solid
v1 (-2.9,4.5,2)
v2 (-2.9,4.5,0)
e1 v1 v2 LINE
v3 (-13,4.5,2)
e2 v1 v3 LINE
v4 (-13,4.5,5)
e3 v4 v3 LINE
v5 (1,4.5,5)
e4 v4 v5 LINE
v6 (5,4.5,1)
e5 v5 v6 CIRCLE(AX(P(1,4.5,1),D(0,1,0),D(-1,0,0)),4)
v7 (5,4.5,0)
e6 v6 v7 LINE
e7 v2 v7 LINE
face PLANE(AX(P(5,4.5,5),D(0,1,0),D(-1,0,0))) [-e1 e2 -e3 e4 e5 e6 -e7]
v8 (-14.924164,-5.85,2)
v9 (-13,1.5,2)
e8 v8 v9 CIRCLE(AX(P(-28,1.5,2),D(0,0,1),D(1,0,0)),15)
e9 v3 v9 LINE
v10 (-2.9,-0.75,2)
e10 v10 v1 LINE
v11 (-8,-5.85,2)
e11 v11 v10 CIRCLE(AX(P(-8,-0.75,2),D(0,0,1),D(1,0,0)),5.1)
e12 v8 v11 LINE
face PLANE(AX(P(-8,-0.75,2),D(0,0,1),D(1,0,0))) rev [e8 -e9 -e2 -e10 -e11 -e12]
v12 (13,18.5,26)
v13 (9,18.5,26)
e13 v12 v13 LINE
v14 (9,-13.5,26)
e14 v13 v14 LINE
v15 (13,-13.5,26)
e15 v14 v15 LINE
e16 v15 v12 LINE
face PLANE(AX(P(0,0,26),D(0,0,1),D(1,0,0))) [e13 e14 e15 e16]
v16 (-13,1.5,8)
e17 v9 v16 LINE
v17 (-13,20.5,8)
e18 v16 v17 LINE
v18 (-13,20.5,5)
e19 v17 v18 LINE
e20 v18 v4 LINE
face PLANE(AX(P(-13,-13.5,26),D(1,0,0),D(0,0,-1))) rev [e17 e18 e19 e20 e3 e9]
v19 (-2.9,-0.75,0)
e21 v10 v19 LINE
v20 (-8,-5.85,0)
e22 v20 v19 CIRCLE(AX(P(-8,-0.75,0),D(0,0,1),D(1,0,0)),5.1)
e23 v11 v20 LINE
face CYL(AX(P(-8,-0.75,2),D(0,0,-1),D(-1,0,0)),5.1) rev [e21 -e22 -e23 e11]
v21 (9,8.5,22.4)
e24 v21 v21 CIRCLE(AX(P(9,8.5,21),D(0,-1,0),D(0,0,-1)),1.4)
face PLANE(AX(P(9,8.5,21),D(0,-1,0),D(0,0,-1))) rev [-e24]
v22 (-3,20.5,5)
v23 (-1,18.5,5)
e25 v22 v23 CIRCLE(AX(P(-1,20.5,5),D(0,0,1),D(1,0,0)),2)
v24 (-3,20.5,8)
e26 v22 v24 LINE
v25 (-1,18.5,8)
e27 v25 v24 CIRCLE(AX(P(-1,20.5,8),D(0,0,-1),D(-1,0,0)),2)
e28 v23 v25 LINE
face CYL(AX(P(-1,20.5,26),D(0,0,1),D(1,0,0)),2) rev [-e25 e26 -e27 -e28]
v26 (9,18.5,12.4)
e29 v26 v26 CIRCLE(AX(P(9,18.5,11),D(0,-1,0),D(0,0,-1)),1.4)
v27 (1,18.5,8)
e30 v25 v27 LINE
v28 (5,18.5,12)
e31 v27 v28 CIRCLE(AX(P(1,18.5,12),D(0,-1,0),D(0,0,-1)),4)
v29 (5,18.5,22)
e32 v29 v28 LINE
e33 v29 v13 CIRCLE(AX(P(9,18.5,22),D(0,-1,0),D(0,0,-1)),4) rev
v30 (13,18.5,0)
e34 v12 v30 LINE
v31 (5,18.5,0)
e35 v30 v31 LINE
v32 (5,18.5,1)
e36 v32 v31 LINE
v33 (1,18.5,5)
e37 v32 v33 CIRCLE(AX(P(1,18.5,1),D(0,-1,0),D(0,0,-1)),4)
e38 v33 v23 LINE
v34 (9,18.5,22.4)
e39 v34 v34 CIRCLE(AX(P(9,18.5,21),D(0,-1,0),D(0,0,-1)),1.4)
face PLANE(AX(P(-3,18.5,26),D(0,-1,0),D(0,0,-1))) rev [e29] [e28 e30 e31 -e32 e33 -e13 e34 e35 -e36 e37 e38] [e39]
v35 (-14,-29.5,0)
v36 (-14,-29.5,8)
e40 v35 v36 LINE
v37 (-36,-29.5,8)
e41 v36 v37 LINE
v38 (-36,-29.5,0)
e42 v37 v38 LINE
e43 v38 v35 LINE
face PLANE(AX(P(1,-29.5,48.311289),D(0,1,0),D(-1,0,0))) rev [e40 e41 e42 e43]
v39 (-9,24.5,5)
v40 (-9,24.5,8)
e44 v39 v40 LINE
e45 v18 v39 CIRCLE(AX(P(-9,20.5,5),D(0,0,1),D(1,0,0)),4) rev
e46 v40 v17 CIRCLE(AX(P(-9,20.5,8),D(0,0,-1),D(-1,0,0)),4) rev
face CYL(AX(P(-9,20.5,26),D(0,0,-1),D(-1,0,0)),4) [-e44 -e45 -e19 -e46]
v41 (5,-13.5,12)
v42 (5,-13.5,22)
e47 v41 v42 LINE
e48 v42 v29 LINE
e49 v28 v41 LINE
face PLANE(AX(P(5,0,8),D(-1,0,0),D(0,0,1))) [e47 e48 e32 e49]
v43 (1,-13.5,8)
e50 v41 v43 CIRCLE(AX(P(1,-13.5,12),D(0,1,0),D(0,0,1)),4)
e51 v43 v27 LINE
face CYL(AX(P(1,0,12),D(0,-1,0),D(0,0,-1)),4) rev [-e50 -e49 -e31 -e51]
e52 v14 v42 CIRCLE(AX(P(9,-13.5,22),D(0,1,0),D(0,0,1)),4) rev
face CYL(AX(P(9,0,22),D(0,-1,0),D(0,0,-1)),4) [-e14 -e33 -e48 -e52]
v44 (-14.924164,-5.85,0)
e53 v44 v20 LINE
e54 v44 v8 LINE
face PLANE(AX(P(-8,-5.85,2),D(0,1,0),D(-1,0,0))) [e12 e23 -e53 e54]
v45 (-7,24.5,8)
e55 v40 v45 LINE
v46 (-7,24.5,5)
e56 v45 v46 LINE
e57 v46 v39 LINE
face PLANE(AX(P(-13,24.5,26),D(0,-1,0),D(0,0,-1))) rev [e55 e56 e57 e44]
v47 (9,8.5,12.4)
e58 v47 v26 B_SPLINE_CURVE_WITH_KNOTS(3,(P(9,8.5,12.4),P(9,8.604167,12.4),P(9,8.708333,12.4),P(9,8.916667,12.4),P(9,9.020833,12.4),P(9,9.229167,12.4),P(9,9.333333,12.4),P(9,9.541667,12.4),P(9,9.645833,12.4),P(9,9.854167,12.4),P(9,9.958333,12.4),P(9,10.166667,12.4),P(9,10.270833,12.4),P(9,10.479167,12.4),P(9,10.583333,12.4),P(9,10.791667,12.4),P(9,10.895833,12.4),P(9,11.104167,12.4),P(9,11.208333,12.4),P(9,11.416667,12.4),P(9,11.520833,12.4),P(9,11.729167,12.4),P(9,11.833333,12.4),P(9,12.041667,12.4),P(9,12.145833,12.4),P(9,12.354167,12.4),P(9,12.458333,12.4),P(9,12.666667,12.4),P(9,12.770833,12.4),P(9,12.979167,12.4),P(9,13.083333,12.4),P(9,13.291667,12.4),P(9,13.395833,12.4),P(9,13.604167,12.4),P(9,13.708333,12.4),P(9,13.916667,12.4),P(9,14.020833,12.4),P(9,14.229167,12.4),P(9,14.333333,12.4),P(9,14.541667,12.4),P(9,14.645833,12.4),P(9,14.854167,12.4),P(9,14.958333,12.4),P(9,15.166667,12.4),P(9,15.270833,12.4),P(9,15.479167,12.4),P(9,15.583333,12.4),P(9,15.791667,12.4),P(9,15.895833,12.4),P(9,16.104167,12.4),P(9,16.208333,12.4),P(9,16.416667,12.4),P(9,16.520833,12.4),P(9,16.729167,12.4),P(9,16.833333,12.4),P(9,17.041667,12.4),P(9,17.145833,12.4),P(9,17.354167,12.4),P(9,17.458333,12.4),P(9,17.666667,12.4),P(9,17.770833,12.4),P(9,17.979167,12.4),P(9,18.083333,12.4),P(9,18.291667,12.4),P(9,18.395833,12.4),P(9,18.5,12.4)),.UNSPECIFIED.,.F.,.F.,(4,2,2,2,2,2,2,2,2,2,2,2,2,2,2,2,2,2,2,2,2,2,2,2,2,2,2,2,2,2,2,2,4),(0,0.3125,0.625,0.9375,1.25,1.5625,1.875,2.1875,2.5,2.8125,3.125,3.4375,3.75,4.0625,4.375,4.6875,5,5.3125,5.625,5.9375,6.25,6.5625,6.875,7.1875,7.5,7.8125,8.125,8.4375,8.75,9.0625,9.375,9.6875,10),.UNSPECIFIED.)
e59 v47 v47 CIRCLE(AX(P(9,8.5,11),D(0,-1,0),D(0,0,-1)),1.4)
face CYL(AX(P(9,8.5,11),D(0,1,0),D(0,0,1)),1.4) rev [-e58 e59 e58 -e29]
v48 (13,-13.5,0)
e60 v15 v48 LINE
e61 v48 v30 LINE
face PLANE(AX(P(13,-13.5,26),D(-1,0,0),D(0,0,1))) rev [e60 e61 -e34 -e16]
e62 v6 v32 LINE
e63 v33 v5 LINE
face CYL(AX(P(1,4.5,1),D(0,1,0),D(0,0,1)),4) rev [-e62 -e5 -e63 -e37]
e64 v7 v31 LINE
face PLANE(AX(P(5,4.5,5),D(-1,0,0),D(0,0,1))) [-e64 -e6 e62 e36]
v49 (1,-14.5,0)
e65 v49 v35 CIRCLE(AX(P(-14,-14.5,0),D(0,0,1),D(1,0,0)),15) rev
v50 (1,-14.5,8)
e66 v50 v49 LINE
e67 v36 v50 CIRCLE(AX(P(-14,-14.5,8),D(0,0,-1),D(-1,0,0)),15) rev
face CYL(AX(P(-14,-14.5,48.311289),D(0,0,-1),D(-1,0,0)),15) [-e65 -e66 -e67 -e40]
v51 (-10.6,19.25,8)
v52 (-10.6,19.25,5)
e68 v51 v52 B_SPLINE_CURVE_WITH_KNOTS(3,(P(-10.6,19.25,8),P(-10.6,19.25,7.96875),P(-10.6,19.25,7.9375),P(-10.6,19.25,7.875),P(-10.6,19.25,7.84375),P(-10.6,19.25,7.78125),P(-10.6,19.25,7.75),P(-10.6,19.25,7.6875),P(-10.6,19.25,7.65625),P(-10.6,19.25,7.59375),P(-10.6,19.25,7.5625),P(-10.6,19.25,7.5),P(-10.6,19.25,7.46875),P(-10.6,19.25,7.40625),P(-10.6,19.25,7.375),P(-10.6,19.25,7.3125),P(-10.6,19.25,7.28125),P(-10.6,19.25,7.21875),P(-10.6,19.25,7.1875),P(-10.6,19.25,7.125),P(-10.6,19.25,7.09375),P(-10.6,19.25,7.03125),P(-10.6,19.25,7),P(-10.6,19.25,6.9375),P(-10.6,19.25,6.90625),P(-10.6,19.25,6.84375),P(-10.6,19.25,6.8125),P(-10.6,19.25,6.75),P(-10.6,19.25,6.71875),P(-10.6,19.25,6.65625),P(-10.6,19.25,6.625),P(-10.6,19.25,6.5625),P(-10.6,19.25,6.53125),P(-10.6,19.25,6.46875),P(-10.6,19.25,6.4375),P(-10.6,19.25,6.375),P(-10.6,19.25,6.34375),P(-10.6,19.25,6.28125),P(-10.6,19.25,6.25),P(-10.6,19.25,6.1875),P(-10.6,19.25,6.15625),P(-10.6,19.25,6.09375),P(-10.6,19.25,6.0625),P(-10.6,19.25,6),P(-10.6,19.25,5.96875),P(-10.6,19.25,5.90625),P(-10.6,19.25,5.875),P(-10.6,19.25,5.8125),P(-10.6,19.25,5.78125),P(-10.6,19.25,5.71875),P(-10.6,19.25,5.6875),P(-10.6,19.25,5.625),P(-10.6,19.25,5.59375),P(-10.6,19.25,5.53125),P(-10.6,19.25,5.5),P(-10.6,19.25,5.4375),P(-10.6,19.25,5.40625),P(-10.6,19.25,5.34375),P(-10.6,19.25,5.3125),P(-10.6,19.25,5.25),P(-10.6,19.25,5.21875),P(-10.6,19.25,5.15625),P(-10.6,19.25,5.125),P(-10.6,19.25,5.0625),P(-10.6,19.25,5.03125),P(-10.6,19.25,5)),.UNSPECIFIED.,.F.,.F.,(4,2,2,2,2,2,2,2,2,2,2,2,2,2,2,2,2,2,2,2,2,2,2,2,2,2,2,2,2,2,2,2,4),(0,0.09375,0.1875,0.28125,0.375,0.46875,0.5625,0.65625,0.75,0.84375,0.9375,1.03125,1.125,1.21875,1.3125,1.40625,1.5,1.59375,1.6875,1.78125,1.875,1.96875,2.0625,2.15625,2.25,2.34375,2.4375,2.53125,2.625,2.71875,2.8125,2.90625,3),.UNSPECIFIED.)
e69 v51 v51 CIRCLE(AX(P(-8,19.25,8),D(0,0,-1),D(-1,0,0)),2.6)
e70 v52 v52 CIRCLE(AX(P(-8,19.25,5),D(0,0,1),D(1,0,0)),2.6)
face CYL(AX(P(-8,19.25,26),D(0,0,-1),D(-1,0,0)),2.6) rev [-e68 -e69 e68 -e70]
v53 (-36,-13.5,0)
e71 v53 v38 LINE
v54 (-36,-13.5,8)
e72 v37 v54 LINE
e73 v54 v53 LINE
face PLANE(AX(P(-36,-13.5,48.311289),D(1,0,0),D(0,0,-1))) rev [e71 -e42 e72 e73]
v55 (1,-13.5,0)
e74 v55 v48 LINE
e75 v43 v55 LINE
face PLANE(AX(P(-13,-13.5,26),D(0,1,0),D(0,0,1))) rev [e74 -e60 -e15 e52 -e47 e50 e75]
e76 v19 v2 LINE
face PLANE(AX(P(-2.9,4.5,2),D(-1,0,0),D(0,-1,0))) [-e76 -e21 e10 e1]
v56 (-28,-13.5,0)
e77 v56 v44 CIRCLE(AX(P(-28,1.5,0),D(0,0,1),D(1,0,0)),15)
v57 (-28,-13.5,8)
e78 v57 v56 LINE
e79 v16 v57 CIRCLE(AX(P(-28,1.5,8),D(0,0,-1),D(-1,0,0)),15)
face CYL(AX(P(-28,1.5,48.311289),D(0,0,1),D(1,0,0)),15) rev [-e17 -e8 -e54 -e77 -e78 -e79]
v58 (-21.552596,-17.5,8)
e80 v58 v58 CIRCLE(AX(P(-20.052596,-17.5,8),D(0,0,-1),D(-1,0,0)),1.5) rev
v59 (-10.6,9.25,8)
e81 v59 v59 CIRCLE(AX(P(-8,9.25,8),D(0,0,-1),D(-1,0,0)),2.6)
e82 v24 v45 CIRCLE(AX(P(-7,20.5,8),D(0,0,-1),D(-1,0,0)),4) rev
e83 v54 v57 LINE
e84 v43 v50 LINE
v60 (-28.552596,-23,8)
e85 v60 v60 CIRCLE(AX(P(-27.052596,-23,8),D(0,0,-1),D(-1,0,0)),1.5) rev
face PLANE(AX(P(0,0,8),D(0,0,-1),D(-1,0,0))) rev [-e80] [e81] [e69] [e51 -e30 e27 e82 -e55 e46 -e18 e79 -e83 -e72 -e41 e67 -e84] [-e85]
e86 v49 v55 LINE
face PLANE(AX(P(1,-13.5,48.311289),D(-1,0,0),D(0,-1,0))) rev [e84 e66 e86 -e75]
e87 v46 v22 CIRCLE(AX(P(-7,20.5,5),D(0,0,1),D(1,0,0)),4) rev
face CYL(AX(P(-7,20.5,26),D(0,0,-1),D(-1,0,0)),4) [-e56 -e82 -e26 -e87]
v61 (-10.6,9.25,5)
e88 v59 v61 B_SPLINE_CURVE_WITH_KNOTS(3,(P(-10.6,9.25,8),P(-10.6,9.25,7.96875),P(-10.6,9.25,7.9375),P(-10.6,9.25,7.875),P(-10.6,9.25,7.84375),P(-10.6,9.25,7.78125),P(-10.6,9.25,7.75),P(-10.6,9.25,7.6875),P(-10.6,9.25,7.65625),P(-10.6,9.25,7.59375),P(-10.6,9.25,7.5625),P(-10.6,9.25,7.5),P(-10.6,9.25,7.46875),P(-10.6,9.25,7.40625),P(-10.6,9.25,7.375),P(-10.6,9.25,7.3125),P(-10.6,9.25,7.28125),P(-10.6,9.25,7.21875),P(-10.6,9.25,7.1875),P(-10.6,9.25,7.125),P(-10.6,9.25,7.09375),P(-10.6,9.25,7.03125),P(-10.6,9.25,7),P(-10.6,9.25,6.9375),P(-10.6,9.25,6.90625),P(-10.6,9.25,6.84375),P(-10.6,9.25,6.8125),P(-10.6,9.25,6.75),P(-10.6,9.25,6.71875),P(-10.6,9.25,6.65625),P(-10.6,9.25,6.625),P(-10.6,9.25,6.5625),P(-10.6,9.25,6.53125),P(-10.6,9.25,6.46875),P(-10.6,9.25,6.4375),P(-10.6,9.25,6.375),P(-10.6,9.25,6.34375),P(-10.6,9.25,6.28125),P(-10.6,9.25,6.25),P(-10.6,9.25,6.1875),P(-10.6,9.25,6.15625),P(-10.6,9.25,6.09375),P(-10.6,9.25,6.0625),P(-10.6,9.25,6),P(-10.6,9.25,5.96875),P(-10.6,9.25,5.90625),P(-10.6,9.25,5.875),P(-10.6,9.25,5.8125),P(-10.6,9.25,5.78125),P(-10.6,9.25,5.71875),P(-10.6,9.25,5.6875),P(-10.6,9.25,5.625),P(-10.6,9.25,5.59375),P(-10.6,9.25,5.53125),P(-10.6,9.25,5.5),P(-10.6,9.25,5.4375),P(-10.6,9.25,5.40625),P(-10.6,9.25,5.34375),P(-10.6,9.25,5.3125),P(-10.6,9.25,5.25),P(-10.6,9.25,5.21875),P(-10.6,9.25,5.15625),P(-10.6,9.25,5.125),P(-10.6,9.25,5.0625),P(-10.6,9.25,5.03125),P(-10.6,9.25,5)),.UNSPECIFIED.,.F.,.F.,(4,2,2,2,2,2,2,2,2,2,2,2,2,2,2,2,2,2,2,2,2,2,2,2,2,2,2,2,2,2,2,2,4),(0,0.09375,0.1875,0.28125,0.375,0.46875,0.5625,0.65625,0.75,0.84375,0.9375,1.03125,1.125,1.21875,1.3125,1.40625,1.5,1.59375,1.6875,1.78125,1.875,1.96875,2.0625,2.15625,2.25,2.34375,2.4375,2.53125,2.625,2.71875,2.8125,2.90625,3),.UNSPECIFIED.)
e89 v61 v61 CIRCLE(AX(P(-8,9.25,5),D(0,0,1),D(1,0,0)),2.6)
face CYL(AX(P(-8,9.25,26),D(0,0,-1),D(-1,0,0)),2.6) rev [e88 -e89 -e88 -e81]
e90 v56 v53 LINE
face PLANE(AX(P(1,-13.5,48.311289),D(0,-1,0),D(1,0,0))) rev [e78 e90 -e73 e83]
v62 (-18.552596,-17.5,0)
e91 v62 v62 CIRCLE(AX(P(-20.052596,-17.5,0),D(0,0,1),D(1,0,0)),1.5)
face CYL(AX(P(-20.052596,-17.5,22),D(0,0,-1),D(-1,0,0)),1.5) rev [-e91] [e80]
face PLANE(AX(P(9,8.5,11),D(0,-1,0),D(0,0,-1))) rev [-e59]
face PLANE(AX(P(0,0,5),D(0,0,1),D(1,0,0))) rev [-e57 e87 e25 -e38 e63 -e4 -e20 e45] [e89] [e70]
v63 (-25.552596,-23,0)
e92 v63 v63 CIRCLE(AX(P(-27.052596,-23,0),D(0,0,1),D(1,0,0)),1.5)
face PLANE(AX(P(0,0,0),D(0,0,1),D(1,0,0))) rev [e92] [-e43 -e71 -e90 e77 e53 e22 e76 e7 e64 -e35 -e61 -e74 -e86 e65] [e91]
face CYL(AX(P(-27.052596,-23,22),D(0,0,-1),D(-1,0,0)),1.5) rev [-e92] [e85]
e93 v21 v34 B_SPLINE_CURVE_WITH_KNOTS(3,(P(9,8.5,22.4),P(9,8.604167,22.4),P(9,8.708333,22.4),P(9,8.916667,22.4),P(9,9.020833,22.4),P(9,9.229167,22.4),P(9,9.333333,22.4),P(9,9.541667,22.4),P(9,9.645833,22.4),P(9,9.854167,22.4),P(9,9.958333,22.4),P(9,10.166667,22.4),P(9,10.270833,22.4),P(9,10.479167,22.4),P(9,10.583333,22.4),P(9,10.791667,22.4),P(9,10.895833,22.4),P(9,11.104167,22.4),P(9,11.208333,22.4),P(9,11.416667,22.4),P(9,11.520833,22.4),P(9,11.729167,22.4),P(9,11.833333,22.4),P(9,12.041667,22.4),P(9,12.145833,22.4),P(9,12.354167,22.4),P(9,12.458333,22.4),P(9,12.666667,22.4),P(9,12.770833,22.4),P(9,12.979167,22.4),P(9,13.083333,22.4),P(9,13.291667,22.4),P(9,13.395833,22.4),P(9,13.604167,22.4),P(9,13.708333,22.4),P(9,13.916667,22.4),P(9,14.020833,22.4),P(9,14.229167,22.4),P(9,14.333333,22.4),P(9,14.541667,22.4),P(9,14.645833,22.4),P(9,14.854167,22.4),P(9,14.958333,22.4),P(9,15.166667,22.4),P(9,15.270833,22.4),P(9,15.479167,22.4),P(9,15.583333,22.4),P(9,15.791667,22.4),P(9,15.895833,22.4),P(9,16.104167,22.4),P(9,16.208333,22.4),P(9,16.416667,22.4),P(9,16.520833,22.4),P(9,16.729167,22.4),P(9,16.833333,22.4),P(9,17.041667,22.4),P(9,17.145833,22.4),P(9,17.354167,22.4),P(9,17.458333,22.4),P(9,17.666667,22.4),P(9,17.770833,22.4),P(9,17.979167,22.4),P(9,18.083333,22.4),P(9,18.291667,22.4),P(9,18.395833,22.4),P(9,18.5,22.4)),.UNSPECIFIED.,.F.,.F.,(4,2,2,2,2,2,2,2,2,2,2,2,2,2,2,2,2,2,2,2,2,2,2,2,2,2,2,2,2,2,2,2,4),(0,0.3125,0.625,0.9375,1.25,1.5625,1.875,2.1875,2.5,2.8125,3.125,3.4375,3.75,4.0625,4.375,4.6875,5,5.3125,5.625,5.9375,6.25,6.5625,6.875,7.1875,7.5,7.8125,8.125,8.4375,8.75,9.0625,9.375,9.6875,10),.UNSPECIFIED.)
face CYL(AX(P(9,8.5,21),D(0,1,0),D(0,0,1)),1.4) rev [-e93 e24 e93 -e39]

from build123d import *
from OCP.BRepFilletAPI import BRepFilletAPI_MakeFillet

# Parameters (mm, degrees)
SKETCH1_R           = 2.6
BOSS_EXTRUDE1_DEPTH = 26
SKETCH2_W           = 18
SKETCH2_H           = 20
CUT_EXTRUDE1_DEPTH  = 5
CUT_EXTRUDE2_START  = 26
SKETCH3_W           = 18
SKETCH3_H           = 38
CUT_EXTRUDE2_DEPTH  = 18
CUT_EXTRUDE3_START  = 18.5
SKETCH4_R           = 1.4
CUT_EXTRUDE3_DEPTH  = 10
FILLET1_R           = 4
FILLET1_R_2         = 2
CUT_EXTRUDE4_DEPTH  = 2
SKETCH6_W           = 37
SKETCH6_H           = 16
BOSS_EXTRUDE2_DEPTH = 8
FILLET2_R           = 15
SKETCH7_R           = 1.5
CUT_EXTRUDE5_DEPTH  = 22


with BuildPart() as part:
    # Sketch1 → Boss-Extrude1 (new body)
    with BuildSketch(Plane.XY):
        Polygon((-13, -13.5), (13, -13.5), (13, 18.5), (-3, 18.5), (-3, 24.5), (-13, 24.5), (-13, 13.5), align=None)
        with Locations(Location((-8, 19.25, 0), (0, 0, 180))):
            Circle(SKETCH1_R, mode=Mode.SUBTRACT)
        with Locations(Location((-8, 9.25, 0), (0, 0, 180))):
            Circle(SKETCH1_R, mode=Mode.SUBTRACT)
    extrude(amount=BOSS_EXTRUDE1_DEPTH)

    # Sketch2 → Cut-Extrude1 (cut)
    with BuildSketch(Plane.XY):
        with Locations((-4, 14.5)):
            Rectangle(SKETCH2_W, SKETCH2_H)
    extrude(amount=CUT_EXTRUDE1_DEPTH, mode=Mode.SUBTRACT)

    # Sketch3 → Cut-Extrude2 (cut)
    with BuildSketch(Plane.XY.offset(CUT_EXTRUDE2_START)):
        with Locations((-4, 5.5)):
            Rectangle(SKETCH3_W, SKETCH3_H)
    extrude(amount=-CUT_EXTRUDE2_DEPTH, mode=Mode.SUBTRACT)

    # Sketch4 → Cut-Extrude3 (cut)
    with BuildSketch(Plane(origin=(0, 0, 0), x_dir=(1, 0, 0), z_dir=(0, 1, 0)).offset(CUT_EXTRUDE3_START)):
        with Locations(Location((9, -11, 0), (0, 0, 270))):
            Circle(SKETCH4_R)
        with Locations(Location((9, -21, 0), (0, 0, 270))):
            Circle(SKETCH4_R)
    extrude(amount=-CUT_EXTRUDE3_DEPTH, mode=Mode.SUBTRACT)

    # Fillet1
    fillet1_edges_1 = [part.edges().sort_by_distance(p)[0] for p in [
        (-3, 24.5, 6.5),
        (-13, 24.5, 6.5),
        (5, 11.5, 5),
        (5, 2.5, 8),
        (5, 2.5, 26),
    ]]
    fillet1_edges_2 = [part.edges().sort_by_distance(p)[0] for p in [
        (-3, 18.5, 6.5),
    ]]
    fillet1 = BRepFilletAPI_MakeFillet(part.part.solid().wrapped)
    for e in fillet1_edges_1:
        fillet1.Add(FILLET1_R - 0.0001, e.wrapped)
    for e in fillet1_edges_2:
        fillet1.Add(FILLET1_R_2 - 0.0001, e.wrapped)
    add(Compound.cast(fillet1.Shape()), mode=Mode.REPLACE)  # a hair under: the kernel refuses the full size

    # Sketch5 → Cut-Extrude4 (cut)
    with BuildSketch(Plane.XY):
        with BuildLine():
            Line((-8, -5.85), (-13, -5.85))
            Line((-13, -5.85), (-13, 4.5))
            Line((-13, 4.5), (-8, 4.5))
            Line((-8, 4.5), (-2.9, 4.5))
            Line((-2.9, 4.5), (-2.9, -0.75))
            ThreePointArc((-2.9, -0.75), (-4.393755416, -4.356244584), (-8, -5.85))
        make_face()
    extrude(amount=CUT_EXTRUDE4_DEPTH, mode=Mode.SUBTRACT)

    # Sketch6 → Boss-Extrude2 (add)
    with BuildSketch(Plane.XY):
        with Locations((-17.5, -21.5)):
            Rectangle(SKETCH6_W, SKETCH6_H)
    extrude(amount=BOSS_EXTRUDE2_DEPTH)

    # Fillet2
    fillet2_edges = [part.edges().sort_by_distance(p)[0] for p in [
        (-13, -13.5, 4),
        (1, -29.5, 4),
    ]]
    fillet(fillet2_edges, radius=FILLET2_R)

    # Sketch7 → Cut-Extrude5 (cut)
    with BuildSketch(Plane.XY):
        with Locations(Location((-20.052596491, -17.5, 0), (0, 0, 180))):
            Circle(SKETCH7_R)
        with Locations(Location((-27.052596491, -23, 0), (0, 0, 180))):
            Circle(SKETCH7_R)
    extrude(amount=CUT_EXTRUDE5_DEPTH, mode=Mode.SUBTRACT)


solid = part.part
